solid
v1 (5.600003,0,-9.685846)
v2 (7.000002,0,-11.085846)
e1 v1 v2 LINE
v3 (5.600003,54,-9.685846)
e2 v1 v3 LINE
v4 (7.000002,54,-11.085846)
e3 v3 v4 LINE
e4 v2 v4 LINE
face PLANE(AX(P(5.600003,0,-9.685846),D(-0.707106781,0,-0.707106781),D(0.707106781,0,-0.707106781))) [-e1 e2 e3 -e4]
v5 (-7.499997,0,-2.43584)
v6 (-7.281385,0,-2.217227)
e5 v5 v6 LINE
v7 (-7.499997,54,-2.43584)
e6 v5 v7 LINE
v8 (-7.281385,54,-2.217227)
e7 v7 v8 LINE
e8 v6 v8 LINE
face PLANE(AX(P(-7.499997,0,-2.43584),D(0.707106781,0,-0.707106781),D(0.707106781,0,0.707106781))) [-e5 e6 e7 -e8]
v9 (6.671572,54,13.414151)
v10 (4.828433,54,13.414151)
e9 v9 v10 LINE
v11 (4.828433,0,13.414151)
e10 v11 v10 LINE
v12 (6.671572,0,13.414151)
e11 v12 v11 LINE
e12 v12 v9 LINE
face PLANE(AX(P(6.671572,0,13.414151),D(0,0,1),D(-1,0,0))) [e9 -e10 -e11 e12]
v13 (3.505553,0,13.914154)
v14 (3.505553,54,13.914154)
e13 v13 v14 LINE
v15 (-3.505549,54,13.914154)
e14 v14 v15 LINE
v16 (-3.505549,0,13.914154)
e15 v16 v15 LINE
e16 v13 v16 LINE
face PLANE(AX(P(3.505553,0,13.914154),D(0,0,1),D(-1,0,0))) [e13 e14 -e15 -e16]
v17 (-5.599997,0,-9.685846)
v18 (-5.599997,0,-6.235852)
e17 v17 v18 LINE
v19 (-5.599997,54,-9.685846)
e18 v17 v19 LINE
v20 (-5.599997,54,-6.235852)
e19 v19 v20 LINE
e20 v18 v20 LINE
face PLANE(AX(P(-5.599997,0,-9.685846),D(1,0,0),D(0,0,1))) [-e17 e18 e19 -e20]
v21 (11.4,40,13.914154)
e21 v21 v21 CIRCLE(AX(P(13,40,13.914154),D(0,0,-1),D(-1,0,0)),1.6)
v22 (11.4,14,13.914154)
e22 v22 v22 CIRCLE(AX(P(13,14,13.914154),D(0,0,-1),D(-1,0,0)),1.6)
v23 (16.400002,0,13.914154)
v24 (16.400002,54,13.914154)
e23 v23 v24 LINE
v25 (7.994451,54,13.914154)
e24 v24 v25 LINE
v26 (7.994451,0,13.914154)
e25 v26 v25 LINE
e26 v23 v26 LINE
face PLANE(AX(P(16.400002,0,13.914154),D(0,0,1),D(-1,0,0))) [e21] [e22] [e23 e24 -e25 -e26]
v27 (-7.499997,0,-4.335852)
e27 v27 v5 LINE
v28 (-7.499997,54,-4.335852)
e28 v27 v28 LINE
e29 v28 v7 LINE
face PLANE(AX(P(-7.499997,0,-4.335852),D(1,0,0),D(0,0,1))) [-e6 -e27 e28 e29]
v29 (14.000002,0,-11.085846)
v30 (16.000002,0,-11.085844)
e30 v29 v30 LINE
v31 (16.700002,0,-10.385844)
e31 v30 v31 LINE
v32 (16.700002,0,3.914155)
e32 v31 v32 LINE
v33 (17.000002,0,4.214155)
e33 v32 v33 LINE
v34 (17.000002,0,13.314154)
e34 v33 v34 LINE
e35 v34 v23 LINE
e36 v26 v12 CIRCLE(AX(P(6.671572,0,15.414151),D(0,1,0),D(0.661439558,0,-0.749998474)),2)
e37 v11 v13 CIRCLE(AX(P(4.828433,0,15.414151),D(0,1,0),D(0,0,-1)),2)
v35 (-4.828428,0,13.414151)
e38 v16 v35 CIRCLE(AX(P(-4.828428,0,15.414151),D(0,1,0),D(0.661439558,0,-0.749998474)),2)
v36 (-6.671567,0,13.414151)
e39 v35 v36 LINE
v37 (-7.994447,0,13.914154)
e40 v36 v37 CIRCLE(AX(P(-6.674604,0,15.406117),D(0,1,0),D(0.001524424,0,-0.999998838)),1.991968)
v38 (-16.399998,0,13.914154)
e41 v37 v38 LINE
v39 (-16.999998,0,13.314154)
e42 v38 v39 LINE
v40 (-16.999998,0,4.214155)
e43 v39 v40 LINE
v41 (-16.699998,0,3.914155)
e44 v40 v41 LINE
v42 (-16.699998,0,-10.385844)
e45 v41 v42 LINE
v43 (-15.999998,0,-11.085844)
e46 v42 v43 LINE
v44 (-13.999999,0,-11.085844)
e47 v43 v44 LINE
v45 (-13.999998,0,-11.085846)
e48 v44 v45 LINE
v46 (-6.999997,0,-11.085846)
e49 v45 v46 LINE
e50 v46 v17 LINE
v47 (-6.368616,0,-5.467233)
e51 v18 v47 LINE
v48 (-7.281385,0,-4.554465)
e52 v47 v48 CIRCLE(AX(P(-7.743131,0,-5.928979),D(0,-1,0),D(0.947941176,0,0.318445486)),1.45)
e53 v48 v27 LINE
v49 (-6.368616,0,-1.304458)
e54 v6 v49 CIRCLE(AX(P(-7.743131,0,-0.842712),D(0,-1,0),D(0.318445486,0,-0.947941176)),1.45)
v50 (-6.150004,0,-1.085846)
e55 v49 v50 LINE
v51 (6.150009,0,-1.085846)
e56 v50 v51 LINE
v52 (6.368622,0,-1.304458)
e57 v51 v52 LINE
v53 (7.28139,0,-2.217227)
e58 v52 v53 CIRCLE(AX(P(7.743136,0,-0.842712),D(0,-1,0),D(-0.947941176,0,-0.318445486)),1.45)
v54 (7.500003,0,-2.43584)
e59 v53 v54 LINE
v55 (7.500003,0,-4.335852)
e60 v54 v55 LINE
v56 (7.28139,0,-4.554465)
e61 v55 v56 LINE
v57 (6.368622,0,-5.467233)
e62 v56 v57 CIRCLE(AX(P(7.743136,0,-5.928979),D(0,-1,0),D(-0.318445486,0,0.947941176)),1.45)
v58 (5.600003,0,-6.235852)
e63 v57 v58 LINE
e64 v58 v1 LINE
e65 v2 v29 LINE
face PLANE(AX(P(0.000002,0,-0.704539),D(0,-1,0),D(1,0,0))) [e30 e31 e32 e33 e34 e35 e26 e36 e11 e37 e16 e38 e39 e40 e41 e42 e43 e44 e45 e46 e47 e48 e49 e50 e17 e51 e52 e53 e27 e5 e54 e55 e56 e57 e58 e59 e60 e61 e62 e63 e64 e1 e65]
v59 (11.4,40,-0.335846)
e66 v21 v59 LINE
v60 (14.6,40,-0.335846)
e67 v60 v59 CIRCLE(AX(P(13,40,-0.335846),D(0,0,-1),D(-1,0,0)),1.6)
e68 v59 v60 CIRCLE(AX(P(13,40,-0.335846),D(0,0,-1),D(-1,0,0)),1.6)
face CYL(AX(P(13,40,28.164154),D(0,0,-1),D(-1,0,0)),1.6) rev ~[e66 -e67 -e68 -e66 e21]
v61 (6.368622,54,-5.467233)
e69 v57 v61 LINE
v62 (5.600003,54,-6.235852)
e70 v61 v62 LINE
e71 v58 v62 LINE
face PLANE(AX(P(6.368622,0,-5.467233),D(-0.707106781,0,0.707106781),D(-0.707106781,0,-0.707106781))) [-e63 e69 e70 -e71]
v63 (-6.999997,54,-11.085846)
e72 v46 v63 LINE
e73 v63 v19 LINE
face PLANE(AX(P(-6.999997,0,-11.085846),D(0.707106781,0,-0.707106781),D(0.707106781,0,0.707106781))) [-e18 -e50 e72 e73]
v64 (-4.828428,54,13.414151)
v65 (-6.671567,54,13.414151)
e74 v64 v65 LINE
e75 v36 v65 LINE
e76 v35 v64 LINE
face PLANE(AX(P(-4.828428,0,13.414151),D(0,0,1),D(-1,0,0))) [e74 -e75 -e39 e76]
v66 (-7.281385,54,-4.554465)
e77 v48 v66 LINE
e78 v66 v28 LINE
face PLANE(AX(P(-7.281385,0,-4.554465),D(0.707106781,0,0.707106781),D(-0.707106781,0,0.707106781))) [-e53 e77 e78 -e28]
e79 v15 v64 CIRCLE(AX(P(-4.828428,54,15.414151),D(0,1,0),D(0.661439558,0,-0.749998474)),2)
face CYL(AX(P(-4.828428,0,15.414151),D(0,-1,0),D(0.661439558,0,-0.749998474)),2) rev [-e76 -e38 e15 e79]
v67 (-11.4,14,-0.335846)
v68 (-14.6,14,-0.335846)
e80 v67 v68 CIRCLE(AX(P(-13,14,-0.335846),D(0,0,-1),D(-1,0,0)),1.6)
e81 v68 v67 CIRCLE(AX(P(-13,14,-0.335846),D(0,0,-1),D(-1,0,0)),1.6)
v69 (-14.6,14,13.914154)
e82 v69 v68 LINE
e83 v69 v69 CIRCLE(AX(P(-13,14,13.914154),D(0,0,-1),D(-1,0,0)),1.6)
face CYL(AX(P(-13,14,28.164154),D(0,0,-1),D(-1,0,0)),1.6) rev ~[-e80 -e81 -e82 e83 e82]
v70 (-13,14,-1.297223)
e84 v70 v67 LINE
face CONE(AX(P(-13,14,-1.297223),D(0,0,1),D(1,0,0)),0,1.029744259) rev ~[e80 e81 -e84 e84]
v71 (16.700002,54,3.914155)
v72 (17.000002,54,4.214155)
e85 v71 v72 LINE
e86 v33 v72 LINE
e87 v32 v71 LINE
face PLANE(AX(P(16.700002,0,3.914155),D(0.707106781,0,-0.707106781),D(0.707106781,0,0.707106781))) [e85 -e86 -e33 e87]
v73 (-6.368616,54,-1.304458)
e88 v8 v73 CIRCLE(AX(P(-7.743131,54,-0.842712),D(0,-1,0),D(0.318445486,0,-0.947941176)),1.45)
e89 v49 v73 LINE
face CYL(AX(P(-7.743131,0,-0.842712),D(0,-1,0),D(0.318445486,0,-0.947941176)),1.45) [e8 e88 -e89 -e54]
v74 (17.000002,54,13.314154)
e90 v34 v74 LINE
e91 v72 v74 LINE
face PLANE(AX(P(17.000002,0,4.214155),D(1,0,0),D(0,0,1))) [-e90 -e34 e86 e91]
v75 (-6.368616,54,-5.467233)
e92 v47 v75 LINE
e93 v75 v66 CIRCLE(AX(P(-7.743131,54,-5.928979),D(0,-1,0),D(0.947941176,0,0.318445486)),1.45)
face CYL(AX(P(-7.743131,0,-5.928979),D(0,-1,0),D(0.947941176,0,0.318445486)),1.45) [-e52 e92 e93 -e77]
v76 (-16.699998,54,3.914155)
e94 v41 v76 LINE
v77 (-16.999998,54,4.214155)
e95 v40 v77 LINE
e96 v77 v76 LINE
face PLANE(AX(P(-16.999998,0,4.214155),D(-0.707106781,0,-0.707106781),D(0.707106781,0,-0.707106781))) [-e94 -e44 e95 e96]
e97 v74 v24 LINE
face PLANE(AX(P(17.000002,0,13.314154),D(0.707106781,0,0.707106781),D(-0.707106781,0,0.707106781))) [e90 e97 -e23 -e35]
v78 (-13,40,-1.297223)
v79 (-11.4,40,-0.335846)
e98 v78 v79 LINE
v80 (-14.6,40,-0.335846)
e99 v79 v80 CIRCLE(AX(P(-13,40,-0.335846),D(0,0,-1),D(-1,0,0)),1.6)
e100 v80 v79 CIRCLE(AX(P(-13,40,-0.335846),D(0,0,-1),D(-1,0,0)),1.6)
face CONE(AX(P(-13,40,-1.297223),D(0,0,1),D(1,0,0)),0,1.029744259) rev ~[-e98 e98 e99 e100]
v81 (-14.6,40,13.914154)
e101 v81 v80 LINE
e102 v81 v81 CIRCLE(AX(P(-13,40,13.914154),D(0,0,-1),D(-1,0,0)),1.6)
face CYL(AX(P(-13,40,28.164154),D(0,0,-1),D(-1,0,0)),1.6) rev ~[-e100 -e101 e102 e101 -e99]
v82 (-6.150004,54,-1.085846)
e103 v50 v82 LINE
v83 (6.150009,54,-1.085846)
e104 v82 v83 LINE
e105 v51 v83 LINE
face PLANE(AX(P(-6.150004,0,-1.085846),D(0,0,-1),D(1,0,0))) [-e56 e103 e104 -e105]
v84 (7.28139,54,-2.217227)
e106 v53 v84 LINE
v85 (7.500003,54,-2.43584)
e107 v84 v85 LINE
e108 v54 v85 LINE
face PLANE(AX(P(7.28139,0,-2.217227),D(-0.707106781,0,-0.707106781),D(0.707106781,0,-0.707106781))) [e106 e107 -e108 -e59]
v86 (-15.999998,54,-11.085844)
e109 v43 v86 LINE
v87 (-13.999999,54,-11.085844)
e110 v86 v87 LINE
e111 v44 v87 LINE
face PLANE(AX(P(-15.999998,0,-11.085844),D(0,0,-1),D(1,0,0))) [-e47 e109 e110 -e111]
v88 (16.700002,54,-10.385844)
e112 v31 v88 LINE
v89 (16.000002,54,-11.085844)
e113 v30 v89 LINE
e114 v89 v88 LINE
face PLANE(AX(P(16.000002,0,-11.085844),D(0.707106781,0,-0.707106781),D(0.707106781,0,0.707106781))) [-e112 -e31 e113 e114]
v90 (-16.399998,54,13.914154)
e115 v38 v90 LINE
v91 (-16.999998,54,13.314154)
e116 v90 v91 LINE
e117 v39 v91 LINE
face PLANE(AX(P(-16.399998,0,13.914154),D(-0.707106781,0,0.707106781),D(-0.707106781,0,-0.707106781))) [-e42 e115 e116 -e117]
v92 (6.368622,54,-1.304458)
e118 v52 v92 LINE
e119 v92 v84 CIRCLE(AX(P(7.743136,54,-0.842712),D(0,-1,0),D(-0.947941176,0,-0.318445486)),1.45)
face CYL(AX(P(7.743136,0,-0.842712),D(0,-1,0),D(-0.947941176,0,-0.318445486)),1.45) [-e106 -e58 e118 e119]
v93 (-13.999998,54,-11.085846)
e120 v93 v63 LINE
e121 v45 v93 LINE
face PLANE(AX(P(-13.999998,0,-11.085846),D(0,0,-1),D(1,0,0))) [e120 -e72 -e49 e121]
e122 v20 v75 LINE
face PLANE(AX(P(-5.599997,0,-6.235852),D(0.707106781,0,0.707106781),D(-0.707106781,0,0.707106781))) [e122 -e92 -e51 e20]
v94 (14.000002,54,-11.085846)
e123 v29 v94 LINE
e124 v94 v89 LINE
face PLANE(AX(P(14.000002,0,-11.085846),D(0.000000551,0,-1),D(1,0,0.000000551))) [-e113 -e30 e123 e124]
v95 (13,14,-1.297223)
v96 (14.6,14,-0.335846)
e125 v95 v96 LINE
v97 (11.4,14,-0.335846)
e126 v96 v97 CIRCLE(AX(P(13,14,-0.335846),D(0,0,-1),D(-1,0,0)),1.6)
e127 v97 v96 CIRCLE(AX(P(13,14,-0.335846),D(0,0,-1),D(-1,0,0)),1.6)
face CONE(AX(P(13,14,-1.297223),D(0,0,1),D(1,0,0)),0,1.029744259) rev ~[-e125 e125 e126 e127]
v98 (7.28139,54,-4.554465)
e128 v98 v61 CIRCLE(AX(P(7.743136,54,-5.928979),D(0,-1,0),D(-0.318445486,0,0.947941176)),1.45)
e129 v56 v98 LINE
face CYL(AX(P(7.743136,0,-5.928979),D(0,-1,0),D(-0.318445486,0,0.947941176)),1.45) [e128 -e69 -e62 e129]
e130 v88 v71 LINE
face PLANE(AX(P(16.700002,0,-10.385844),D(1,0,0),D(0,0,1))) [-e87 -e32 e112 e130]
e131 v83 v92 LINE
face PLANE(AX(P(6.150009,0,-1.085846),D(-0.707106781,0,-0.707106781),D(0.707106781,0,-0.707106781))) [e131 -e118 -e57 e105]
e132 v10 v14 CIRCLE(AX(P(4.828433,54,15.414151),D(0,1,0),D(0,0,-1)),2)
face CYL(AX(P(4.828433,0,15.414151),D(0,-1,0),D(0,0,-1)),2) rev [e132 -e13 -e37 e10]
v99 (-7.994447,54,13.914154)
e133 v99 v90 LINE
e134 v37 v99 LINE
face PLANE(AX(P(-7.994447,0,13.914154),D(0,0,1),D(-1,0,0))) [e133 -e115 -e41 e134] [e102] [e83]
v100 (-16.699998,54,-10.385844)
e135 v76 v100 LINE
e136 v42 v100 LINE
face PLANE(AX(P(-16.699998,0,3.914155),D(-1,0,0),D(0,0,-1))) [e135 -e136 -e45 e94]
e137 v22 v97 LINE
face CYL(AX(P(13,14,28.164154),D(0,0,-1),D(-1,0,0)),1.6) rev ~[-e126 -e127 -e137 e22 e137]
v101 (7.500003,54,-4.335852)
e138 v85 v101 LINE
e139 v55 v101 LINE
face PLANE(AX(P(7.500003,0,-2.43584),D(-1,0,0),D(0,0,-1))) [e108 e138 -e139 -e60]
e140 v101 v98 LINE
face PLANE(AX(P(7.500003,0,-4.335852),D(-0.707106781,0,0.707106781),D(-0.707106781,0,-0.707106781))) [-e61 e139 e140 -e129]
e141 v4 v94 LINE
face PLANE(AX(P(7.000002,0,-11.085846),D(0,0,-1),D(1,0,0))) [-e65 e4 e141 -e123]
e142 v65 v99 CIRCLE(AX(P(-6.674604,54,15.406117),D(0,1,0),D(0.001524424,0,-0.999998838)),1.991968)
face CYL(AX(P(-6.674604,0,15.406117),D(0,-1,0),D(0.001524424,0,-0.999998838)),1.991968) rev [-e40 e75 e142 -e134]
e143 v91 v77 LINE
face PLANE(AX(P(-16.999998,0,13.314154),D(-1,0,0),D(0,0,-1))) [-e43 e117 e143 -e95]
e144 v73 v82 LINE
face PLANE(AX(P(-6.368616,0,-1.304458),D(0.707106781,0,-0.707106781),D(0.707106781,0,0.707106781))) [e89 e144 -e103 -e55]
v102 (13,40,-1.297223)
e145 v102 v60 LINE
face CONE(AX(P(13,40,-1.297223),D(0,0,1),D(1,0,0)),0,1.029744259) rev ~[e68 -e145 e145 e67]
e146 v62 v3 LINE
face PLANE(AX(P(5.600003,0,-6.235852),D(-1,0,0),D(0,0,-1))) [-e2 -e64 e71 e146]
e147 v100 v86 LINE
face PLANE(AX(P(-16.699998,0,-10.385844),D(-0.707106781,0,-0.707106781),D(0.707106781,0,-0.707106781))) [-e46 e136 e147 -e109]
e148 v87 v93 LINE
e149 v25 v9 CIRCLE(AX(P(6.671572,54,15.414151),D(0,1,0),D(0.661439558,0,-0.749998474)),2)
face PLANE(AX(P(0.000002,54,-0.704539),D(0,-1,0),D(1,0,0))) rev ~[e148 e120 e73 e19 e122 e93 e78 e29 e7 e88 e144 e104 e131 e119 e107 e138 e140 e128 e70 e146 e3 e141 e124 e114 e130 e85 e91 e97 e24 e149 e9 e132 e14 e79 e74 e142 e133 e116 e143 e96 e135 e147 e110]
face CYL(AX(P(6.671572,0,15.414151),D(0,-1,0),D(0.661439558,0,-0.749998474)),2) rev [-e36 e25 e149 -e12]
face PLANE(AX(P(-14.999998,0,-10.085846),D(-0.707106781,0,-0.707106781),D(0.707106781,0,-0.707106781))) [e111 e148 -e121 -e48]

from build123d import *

# Parameters (mm, degrees)
F1_DEPTH = 54
F2_DEPTH = 54
F4_D     = 3.2
F4_DEPTH = 14.25
F4_TIP   = 0.9613769904


# Not quite as in the source:
# - ends of sketch curves that miss each other by under 0.0002 mm in the source are joined


with BuildPart() as f1:
    # F0 (on Front) → F1 (new body)
    with BuildSketch(Plane.XZ):
        with BuildLine():
            Line((-15.9999975914, -11.0858444687), (-13.9999981419, -11.0858444687))
            Line((-13.9999981419, -11.0858444687), (-14.9999975913, -10.0858455697))
            Line((-14.9999975913, -10.0858455697), (-14.9999975913, 8.4141544303))
            Line((-14.9999975913, 8.4141544303), (-13.9999975913, 9.4141544303))
            Line((-13.9999975913, 9.4141544303), (14.0000024087, 9.4141544303))
            Line((14.0000024087, 9.4141544303), (15.0000024087, 8.4141544303))
            Line((15.0000024087, 8.4141544303), (15.0000024087, -10.0858455697))
            Line((15.0000024087, -10.0858455697), (14.0000024087, -11.0858455697))
            Line((14.0000024087, -11.0858455697), (16.0000024087, -11.0858444685))
            Line((16.0000024087, -11.0858444685), (16.7000024086, -10.3858444685))
            Line((16.7000024086, -10.3858444685), (16.7000024087, 3.914155003))
            Line((16.7000024087, 3.914155003), (17.0000024087, 4.2141550029))
            Line((17.0000024087, 4.2141550029), (17.0000024088, 13.3141544304))
            Line((17.0000024088, 13.3141544304), (16.4000024089, 13.9141544303))
            Line((16.4000024089, 13.9141544303), (7.9944513482, 13.9141544304))
            ThreePointArc((7.9944513482, 13.9141544304), (7.3786811713, 13.5433235007), (6.671572232, 13.4141513784))
            Line((6.671572232, 13.4141513784), (4.8284325856, 13.4141513784))
            ThreePointArc((4.8284325856, 13.4141513784), (4.1213236463, 13.5433235007), (3.5055534694, 13.9141544304))
            Line((3.5055534694, 13.9141544304), (-3.5055486519, 13.9141544303))
            ThreePointArc((-3.5055486519, 13.9141544303), (-4.1213188288, 13.5433235006), (-4.828427768, 13.4141513784))
            Line((-4.828427768, 13.4141513784), (-6.6715674144, 13.4141513784))
            ThreePointArc((-6.6715674144, 13.4141513784), (-7.3788732943, 13.5428024468), (-7.9944465306, 13.9141544304))
            Line((-7.9944465306, 13.9141544304), (-16.3999975914, 13.9141544303))
            Line((-16.3999975914, 13.9141544303), (-16.9999975913, 13.3141544304))
            Line((-16.9999975913, 13.3141544304), (-16.9999975913, 4.2141550029))
            Line((-16.9999975913, 4.2141550029), (-16.6999975912, 3.9141550028))
            Line((-16.6999975912, 3.9141550028), (-16.6999975914, -10.3858444687))
            Line((-16.6999975914, -10.3858444687), (-15.9999975914, -11.0858444687))
        make_face()
    extrude(amount=-F1_DEPTH)

    # F0 (on Front) → F2 (join)
    with BuildSketch(Plane.XZ):
        with BuildLine():
            Line((-13.9999975913, -11.0858455697), (-6.9999968681, -11.0858455697))
            Line((-6.9999968681, -11.0858455697), (-5.5999972297, -9.6858459313))
            Line((-5.5999972297, -9.6858459313), (-5.5999972297, -6.2358522996))
            Line((-5.5999972297, -6.2358522996), (-6.3686160385, -5.4672334908))
            ThreePointArc((-6.3686160385, -5.4672334908), (-6.7178259107, -4.9036746123), (-7.2813847892, -4.5544647401))
            Line((-7.2813847892, -4.5544647401), (-7.4999972297, -4.3358522996))
            Line((-7.4999972297, -4.3358522996), (-7.4999972297, -2.435839563))
            Line((-7.4999972297, -2.435839563), (-7.2813847892, -2.2172271225))
            ThreePointArc((-7.2813847892, -2.2172271225), (-6.7178259107, -1.8680172504), (-6.3686160385, -1.3044583718))
            Line((-6.3686160385, -1.3044583718), (-6.150003598, -1.0858459313))
            Line((-6.150003598, -1.0858459313), (6.1500091386, -1.0858459313))
            Line((6.1500091386, -1.0858459313), (6.3686215791, -1.3044583718))
            ThreePointArc((6.3686215791, -1.3044583718), (6.7178314512, -1.8680172504), (7.2813903298, -2.2172271225))
            Line((7.2813903298, -2.2172271225), (7.5000027703, -2.435839563))
            Line((7.5000027703, -2.435839563), (7.5000027704, -4.3358522996))
            Line((7.5000027704, -4.3358522996), (7.2813903299, -4.5544647401))
            ThreePointArc((7.2813903299, -4.5544647401), (6.7178314513, -4.9036746123), (6.3686215792, -5.4672334908))
            Line((6.3686215792, -5.4672334908), (5.6000027704, -6.2358522996))
            Line((5.6000027704, -6.2358522996), (5.6000027703, -9.6858459313))
            Line((5.6000027703, -9.6858459313), (7.0000024087, -11.0858455697))
            Line((7.0000024087, -11.0858455697), (14.0000024087, -11.0858455697))
            Line((14.0000024087, -11.0858455697), (15.0000024087, -10.0858455697))
            Line((15.0000024087, -10.0858455697), (15.0000024087, 8.4141544303))
            Line((15.0000024087, 8.4141544303), (14.0000024087, 9.4141544303))
            Line((14.0000024087, 9.4141544303), (-13.9999975913, 9.4141544303))
            Line((-13.9999975913, 9.4141544303), (-14.9999975913, 8.4141544303))
            Line((-14.9999975913, 8.4141544303), (-14.9999975913, -10.0858455697))
            Line((-14.9999975913, -10.0858455697), (-13.9999975913, -11.0858455697))
        make_face()
    extrude(amount=-F2_DEPTH)

    # F4
    with Locations(Plane.XY.offset(13.9141544304)):
        with Locations((13.0000000001, 14), (-12.9999999999, 14), (-12.9999999999, 40), (13.0000000001, 40)):
            Hole(F4_D / 2, depth=F4_DEPTH)
            with Locations((0, 0, -(F4_DEPTH + F4_TIP / 2))):  # 118° drill point
                Cone(0, F4_D / 2, F4_TIP, mode=Mode.SUBTRACT)


solid = f1.part
